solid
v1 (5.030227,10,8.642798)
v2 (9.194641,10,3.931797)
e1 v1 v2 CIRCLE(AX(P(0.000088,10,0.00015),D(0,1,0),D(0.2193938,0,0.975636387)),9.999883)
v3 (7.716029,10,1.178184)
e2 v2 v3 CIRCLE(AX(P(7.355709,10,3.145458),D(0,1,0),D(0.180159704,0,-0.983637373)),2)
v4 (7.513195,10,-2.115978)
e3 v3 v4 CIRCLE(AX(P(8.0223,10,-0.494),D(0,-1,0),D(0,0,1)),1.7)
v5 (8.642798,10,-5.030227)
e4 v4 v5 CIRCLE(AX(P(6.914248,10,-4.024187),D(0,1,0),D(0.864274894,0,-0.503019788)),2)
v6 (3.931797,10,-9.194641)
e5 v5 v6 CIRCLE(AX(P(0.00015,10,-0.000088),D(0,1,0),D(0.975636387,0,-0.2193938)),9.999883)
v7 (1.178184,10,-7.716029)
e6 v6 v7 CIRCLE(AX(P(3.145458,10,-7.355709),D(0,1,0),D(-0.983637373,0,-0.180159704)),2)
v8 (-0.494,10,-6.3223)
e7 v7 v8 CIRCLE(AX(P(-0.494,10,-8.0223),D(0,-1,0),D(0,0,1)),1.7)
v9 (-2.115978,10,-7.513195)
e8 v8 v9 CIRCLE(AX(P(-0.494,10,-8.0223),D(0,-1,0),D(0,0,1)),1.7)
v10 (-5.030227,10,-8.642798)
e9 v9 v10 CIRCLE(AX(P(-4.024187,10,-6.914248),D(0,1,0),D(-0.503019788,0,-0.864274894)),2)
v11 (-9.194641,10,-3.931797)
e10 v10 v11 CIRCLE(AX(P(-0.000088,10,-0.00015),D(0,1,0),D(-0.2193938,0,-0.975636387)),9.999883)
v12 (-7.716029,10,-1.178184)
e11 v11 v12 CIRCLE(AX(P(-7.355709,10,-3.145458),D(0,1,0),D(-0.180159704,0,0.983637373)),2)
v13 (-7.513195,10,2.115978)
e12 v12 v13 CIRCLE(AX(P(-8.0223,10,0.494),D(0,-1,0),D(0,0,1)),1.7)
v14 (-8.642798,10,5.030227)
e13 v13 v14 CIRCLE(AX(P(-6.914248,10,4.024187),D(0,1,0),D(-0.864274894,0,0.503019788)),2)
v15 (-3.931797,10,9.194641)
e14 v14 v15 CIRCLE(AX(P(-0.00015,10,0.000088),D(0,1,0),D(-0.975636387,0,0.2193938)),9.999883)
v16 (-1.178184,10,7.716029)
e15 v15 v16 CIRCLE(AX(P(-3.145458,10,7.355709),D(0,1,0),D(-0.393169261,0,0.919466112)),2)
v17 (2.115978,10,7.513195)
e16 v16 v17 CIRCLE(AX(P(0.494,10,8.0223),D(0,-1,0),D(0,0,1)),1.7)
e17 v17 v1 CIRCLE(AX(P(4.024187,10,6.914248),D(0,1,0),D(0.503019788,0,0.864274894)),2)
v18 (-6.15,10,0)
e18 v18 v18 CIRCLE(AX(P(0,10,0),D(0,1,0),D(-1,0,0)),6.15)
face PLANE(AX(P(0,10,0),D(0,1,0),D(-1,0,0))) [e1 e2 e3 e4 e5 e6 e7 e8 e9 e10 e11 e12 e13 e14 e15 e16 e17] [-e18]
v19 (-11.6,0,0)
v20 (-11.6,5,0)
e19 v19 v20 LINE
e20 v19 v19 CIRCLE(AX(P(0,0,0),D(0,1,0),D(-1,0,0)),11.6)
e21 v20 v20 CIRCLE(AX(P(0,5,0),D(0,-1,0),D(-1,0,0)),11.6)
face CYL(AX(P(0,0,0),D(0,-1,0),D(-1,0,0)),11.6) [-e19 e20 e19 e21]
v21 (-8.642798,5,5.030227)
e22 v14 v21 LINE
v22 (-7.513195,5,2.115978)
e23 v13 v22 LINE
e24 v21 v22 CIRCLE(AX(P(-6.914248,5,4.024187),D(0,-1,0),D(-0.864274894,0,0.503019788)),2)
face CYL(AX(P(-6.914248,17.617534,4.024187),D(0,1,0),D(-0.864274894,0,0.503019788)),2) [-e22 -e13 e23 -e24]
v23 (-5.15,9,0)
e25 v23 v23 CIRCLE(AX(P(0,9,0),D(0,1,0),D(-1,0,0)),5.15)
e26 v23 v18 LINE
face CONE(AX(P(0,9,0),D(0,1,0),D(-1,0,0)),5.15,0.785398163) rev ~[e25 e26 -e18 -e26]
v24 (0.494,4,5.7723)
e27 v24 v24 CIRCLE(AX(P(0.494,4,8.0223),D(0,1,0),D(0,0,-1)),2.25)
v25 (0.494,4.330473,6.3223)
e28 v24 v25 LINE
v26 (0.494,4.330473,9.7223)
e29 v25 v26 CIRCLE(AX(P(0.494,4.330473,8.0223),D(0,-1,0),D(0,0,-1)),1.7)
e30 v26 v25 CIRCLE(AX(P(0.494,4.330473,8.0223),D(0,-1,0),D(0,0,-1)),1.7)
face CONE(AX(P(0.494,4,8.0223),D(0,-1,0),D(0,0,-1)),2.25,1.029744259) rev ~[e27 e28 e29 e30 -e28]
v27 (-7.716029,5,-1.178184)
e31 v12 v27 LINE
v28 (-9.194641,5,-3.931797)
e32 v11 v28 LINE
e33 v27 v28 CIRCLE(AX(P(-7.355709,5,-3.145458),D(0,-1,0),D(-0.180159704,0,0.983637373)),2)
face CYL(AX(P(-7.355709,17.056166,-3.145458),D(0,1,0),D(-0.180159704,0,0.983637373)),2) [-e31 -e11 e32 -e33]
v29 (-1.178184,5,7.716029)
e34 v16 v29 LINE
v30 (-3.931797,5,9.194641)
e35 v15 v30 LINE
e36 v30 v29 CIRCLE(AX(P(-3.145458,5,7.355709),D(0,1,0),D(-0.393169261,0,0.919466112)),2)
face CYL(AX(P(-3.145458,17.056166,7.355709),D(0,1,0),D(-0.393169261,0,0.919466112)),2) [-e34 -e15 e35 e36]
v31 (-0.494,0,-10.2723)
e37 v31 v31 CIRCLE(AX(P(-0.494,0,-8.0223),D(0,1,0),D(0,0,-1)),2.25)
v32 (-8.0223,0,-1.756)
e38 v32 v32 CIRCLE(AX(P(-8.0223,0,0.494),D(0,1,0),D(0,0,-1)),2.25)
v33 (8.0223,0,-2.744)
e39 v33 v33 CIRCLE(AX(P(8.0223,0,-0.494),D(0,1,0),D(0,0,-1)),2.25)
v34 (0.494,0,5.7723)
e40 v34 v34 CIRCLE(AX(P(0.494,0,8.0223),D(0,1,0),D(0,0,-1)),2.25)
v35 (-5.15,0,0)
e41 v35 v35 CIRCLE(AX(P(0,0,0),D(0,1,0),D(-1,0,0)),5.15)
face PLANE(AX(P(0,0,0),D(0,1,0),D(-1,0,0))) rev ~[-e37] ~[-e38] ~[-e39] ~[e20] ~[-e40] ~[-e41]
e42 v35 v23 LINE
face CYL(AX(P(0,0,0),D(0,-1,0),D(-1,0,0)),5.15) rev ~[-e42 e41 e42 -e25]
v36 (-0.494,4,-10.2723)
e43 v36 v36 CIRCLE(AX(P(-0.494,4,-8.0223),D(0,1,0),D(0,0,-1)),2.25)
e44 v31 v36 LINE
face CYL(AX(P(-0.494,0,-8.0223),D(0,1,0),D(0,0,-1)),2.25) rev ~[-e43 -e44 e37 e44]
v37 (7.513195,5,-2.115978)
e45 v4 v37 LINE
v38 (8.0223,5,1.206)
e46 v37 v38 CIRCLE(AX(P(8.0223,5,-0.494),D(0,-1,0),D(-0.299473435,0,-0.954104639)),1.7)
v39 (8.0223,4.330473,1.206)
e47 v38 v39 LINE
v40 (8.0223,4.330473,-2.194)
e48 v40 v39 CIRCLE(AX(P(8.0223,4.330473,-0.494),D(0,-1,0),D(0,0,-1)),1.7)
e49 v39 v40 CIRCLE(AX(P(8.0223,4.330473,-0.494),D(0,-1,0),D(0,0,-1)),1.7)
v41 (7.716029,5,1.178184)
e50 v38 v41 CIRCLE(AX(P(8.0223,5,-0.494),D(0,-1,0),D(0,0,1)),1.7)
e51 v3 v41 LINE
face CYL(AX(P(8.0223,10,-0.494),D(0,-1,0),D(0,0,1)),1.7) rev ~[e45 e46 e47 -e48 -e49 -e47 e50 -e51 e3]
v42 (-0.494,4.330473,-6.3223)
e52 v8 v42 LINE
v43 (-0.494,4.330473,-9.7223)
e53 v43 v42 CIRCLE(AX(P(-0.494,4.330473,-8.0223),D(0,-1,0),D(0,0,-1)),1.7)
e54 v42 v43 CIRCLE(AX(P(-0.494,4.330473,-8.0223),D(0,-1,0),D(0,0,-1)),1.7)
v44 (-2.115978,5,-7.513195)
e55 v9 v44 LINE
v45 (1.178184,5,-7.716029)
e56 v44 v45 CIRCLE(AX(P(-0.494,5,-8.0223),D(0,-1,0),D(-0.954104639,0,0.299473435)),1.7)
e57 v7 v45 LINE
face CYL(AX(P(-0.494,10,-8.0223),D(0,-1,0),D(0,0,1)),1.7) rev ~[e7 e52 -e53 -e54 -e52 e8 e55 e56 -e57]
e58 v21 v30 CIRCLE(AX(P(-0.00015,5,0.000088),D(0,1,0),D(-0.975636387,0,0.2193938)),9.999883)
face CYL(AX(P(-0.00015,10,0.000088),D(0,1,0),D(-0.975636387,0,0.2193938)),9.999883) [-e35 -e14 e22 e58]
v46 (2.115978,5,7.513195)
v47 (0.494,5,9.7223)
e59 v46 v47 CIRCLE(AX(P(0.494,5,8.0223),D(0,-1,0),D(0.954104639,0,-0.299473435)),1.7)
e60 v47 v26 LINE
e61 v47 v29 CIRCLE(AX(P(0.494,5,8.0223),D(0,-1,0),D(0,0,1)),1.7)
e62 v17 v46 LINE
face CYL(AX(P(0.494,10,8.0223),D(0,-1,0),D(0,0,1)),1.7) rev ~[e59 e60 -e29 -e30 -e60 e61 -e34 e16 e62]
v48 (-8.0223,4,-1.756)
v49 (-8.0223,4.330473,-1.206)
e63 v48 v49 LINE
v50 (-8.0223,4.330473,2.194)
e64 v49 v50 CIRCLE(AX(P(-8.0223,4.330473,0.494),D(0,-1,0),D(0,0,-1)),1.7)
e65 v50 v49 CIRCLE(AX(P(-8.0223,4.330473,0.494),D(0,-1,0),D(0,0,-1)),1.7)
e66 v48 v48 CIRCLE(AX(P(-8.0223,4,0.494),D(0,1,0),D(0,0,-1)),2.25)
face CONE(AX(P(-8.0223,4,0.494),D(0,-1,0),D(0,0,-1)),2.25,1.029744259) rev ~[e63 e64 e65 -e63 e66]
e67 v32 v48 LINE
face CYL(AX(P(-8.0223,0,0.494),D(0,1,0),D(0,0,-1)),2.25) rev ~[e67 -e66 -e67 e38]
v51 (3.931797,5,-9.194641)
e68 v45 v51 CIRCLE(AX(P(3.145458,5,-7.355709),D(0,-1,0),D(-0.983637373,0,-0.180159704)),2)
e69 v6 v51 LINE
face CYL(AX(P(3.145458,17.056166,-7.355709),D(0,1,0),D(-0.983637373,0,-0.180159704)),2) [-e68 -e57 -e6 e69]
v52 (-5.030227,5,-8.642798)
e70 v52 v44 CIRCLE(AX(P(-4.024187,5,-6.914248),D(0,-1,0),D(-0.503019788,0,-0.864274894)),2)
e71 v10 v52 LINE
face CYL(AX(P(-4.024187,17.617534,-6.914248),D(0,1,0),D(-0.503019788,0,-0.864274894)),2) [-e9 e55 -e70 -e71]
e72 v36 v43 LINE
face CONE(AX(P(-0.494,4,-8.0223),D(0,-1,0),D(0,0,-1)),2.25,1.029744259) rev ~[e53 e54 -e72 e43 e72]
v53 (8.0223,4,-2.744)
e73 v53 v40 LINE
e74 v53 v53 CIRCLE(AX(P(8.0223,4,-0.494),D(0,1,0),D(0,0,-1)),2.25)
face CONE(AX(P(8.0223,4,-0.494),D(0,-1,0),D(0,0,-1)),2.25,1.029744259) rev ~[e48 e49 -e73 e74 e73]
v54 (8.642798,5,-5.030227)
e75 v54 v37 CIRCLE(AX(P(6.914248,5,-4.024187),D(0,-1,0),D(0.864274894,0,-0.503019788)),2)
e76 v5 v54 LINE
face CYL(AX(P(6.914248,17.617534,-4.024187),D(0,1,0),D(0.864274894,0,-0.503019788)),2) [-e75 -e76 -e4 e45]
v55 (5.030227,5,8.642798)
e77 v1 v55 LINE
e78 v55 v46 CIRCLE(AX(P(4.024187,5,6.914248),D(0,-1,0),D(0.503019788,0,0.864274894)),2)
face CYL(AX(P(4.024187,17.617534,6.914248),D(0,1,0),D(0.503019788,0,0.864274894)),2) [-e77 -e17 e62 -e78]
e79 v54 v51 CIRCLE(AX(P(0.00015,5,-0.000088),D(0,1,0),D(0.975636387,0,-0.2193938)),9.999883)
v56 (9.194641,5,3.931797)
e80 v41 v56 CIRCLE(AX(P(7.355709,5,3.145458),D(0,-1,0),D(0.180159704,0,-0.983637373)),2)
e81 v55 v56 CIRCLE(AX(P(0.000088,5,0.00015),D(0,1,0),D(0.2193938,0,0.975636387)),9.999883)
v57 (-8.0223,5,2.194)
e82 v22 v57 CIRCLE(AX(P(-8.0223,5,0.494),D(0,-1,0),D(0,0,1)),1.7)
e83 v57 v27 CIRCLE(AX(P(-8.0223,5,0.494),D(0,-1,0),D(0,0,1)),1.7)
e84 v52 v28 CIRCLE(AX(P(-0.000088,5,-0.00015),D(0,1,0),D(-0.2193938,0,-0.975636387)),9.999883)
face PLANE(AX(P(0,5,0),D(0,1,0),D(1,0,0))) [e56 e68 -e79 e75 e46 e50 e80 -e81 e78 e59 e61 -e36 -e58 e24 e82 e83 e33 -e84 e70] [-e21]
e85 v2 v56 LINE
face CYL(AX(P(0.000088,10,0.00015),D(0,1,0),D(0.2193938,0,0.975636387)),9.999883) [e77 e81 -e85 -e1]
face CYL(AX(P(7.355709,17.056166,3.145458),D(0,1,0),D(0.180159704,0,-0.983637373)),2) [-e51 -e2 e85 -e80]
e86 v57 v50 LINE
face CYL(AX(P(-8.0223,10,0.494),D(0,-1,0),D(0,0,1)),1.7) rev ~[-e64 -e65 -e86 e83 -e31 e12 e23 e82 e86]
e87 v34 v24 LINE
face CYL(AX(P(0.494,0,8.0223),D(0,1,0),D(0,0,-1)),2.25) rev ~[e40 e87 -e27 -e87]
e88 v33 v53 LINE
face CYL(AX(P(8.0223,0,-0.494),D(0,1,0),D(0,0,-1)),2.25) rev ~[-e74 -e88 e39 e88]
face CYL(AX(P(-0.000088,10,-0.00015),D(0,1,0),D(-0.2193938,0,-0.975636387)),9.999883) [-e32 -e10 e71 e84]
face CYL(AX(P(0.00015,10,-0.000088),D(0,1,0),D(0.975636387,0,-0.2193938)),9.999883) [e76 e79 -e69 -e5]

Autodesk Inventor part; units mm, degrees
ref_plane "YZ Plane" through (0, 0, 0) normal (1, 0, 0) x (0, 1, 0)
ref_plane "XZ Plane" through (0, 0, 0) normal (0, 1, 0) x (-1, 0, 0)
ref_plane "XY Plane" through (0, 0, 0) normal (0, 0, 1) x (1, 0, 0)
sketch "Boceto1" plane through (0, 0, 0) normal (0, 1, 0) x (-1, 0, 0)
  circle A0 centre (0, 0) radius 5.15
  circle A1 centre (0, 0) radius 11.6
  dimension "d0" = 10.3
  dimension "d1" = 23.2
extrude "Extrusión1" add sketch "Boceto1" along normal blind 10
sketch "Boceto2" plane through (0, 10, 0) normal (0, 1, 0) x (1, 0, 0)
  circle A0 centre (-0.494, 8.0223) radius 1.425 projected
  circle A1 centre (-0.494, 8.0223) radius 1.425 projected
  circle A2 centre (-8.0223, -0.494) radius 1.425 projected
  circle A3 centre (0.494, -8.0223) radius 1.425 projected
  circle A4 centre (8.0223, 0.494) radius 1.425 projected
  circle A5 centre (0, 0) radius 11 projected
  circle A6 centre (0, 0) radius 1.5 projected
  point P0 (0, 0)
hole "Agujero1" at (-0.494, 10, -8.0223) at (8.0223, 10, -0.494) at (0.494, 10, 8.0223) at (-8.0223, 10, 0.494) direction (0, -1, 0) diameter 3.4 end through all
sketch "Boceto3" plane through (0, 0, 0) normal (0, -1, 0) x (1, 0, 0)
  circle A0 centre (-8.0223, 0.494) radius 1.7 projected
  circle A1 centre (0.494, 8.0223) radius 1.7 projected
  circle A2 centre (8.0223, -0.494) radius 1.7 projected
  circle A3 centre (-0.494, -8.0223) radius 1.7 projected
  circle A4 centre (0, 0) radius 11.6 projected
  circle A5 centre (0, 0) radius 5.15 projected
hole "Agujero2" at (-0.494, 0, -8.0223) at (-8.0223, 0, 0.494) at (0.494, 0, 8.0223) at (8.0223, 0, -0.494) direction (0, 1, 0) diameter 4.5 depth 4 tip angle 118
sketch "Boceto4" plane through (0, 10, 0) normal (0, 1, 0) x (1, 0, 0)
  circle A0 centre (-0.494, 8.0223) radius 1.425 projected
  circle A1 centre (-8.0223, -0.494) radius 1.425 projected
  circle A2 centre (0.494, -8.0223) radius 1.425 projected
  circle A3 centre (8.0223, 0.494) radius 1.425 projected
  circle A4 centre (0, 0) radius 11 projected
  circle A5 centre (0, 0) radius 5 projected
  line L0 (-9.7564, -2.194) -> (-8.0223, -2.194)
  circle A6 centre (-8.0223, -0.494) radius 1.7 projected
  line L1 (-8.0223, 1.206) -> (-9.927, 1.206)
  line L2 (-1.206, -8.0223) -> (-1.206, -9.927)
  line L3 (2.194, -9.7564) -> (2.194, -8.0223)
  line L4 (8.0223, -1.206) -> (9.927, -1.206)
  line L5 (9.7564, 2.194) -> (8.0223, 2.194)
  line L6 (1.206, 8.0223) -> (1.206, 9.927)
  line L7 (-2.194, 9.7564) -> (-2.194, 8.0223)
  arc A7 (-2.194, 9.7564) -> (-9.927, 1.206) centre (0, 0) ccw
  arc A8 (9.7564, 2.194) -> (1.206, 9.927) centre (0, 0) ccw
  arc A9 (-9.7564, -2.194) -> (-1.206, -9.927) centre (0, 0) ccw
  arc A10 (2.194, -9.7564) -> (9.927, -1.206) centre (0, 0) ccw
  circle A11 centre (-0.494, 8.0223) radius 1.425 projected
  circle A12 centre (-8.0223, -0.494) radius 1.425 projected
  circle A13 centre (0.494, -8.0223) radius 1.425 projected
  circle A14 centre (8.0223, 0.494) radius 1.425 projected
  circle A15 centre (0, 0) radius 11 projected
  circle A16 centre (0, 0) radius 1.5 projected
  circle A17 centre (-0.494, 8.0223) radius 1.425 projected
  circle A18 centre (-8.0223, -0.494) radius 1.425 projected
  circle A19 centre (0.494, -8.0223) radius 1.425 projected
  circle A20 centre (8.0223, 0.494) radius 1.425 projected
  circle A21 centre (0, 0) radius 11 projected
  circle A22 centre (0, 0) radius 5 projected
  circle A23 centre (-0.494, 8.0223) radius 1.425 projected
  circle A24 centre (-8.0223, -0.494) radius 1.425 projected
  circle A25 centre (0.494, -8.0223) radius 1.425 projected
  circle A26 centre (8.0223, 0.494) radius 1.425 projected
  circle A27 centre (0, 0) radius 11 projected
  circle A28 centre (0, 0) radius 5 projected
  circle A29 centre (0.494, -8.0223) radius 1.7 projected
  circle A30 centre (8.0223, 0.494) radius 1.7 projected
  circle A31 centre (-0.494, 8.0223) radius 1.7 projected
  circle A32 centre (0, 0) radius 11.6 projected
  dimension "d21" = 360
extrude "Extrusión2" cut sketch "Boceto4" against normal blind 5 contours A4 | A32
fillet "Empalme1" radius 2 8 edges at (-9.7564, 7.5, 2.194) (-9.927, 7.5, -1.206) (-2.194, 7.5, -9.7564) (1.206, 7.5, -9.927) (-1.206, 7.5, 9.927) (2.194, 7.5, 9.7564) (9.927, 7.5, 1.206) (9.7564, 7.5, -2.194)
chamfer "Chaflán1" distance 1 angle 45 1 edges at (5.15, 10, 0)
properties part number "Polea"
